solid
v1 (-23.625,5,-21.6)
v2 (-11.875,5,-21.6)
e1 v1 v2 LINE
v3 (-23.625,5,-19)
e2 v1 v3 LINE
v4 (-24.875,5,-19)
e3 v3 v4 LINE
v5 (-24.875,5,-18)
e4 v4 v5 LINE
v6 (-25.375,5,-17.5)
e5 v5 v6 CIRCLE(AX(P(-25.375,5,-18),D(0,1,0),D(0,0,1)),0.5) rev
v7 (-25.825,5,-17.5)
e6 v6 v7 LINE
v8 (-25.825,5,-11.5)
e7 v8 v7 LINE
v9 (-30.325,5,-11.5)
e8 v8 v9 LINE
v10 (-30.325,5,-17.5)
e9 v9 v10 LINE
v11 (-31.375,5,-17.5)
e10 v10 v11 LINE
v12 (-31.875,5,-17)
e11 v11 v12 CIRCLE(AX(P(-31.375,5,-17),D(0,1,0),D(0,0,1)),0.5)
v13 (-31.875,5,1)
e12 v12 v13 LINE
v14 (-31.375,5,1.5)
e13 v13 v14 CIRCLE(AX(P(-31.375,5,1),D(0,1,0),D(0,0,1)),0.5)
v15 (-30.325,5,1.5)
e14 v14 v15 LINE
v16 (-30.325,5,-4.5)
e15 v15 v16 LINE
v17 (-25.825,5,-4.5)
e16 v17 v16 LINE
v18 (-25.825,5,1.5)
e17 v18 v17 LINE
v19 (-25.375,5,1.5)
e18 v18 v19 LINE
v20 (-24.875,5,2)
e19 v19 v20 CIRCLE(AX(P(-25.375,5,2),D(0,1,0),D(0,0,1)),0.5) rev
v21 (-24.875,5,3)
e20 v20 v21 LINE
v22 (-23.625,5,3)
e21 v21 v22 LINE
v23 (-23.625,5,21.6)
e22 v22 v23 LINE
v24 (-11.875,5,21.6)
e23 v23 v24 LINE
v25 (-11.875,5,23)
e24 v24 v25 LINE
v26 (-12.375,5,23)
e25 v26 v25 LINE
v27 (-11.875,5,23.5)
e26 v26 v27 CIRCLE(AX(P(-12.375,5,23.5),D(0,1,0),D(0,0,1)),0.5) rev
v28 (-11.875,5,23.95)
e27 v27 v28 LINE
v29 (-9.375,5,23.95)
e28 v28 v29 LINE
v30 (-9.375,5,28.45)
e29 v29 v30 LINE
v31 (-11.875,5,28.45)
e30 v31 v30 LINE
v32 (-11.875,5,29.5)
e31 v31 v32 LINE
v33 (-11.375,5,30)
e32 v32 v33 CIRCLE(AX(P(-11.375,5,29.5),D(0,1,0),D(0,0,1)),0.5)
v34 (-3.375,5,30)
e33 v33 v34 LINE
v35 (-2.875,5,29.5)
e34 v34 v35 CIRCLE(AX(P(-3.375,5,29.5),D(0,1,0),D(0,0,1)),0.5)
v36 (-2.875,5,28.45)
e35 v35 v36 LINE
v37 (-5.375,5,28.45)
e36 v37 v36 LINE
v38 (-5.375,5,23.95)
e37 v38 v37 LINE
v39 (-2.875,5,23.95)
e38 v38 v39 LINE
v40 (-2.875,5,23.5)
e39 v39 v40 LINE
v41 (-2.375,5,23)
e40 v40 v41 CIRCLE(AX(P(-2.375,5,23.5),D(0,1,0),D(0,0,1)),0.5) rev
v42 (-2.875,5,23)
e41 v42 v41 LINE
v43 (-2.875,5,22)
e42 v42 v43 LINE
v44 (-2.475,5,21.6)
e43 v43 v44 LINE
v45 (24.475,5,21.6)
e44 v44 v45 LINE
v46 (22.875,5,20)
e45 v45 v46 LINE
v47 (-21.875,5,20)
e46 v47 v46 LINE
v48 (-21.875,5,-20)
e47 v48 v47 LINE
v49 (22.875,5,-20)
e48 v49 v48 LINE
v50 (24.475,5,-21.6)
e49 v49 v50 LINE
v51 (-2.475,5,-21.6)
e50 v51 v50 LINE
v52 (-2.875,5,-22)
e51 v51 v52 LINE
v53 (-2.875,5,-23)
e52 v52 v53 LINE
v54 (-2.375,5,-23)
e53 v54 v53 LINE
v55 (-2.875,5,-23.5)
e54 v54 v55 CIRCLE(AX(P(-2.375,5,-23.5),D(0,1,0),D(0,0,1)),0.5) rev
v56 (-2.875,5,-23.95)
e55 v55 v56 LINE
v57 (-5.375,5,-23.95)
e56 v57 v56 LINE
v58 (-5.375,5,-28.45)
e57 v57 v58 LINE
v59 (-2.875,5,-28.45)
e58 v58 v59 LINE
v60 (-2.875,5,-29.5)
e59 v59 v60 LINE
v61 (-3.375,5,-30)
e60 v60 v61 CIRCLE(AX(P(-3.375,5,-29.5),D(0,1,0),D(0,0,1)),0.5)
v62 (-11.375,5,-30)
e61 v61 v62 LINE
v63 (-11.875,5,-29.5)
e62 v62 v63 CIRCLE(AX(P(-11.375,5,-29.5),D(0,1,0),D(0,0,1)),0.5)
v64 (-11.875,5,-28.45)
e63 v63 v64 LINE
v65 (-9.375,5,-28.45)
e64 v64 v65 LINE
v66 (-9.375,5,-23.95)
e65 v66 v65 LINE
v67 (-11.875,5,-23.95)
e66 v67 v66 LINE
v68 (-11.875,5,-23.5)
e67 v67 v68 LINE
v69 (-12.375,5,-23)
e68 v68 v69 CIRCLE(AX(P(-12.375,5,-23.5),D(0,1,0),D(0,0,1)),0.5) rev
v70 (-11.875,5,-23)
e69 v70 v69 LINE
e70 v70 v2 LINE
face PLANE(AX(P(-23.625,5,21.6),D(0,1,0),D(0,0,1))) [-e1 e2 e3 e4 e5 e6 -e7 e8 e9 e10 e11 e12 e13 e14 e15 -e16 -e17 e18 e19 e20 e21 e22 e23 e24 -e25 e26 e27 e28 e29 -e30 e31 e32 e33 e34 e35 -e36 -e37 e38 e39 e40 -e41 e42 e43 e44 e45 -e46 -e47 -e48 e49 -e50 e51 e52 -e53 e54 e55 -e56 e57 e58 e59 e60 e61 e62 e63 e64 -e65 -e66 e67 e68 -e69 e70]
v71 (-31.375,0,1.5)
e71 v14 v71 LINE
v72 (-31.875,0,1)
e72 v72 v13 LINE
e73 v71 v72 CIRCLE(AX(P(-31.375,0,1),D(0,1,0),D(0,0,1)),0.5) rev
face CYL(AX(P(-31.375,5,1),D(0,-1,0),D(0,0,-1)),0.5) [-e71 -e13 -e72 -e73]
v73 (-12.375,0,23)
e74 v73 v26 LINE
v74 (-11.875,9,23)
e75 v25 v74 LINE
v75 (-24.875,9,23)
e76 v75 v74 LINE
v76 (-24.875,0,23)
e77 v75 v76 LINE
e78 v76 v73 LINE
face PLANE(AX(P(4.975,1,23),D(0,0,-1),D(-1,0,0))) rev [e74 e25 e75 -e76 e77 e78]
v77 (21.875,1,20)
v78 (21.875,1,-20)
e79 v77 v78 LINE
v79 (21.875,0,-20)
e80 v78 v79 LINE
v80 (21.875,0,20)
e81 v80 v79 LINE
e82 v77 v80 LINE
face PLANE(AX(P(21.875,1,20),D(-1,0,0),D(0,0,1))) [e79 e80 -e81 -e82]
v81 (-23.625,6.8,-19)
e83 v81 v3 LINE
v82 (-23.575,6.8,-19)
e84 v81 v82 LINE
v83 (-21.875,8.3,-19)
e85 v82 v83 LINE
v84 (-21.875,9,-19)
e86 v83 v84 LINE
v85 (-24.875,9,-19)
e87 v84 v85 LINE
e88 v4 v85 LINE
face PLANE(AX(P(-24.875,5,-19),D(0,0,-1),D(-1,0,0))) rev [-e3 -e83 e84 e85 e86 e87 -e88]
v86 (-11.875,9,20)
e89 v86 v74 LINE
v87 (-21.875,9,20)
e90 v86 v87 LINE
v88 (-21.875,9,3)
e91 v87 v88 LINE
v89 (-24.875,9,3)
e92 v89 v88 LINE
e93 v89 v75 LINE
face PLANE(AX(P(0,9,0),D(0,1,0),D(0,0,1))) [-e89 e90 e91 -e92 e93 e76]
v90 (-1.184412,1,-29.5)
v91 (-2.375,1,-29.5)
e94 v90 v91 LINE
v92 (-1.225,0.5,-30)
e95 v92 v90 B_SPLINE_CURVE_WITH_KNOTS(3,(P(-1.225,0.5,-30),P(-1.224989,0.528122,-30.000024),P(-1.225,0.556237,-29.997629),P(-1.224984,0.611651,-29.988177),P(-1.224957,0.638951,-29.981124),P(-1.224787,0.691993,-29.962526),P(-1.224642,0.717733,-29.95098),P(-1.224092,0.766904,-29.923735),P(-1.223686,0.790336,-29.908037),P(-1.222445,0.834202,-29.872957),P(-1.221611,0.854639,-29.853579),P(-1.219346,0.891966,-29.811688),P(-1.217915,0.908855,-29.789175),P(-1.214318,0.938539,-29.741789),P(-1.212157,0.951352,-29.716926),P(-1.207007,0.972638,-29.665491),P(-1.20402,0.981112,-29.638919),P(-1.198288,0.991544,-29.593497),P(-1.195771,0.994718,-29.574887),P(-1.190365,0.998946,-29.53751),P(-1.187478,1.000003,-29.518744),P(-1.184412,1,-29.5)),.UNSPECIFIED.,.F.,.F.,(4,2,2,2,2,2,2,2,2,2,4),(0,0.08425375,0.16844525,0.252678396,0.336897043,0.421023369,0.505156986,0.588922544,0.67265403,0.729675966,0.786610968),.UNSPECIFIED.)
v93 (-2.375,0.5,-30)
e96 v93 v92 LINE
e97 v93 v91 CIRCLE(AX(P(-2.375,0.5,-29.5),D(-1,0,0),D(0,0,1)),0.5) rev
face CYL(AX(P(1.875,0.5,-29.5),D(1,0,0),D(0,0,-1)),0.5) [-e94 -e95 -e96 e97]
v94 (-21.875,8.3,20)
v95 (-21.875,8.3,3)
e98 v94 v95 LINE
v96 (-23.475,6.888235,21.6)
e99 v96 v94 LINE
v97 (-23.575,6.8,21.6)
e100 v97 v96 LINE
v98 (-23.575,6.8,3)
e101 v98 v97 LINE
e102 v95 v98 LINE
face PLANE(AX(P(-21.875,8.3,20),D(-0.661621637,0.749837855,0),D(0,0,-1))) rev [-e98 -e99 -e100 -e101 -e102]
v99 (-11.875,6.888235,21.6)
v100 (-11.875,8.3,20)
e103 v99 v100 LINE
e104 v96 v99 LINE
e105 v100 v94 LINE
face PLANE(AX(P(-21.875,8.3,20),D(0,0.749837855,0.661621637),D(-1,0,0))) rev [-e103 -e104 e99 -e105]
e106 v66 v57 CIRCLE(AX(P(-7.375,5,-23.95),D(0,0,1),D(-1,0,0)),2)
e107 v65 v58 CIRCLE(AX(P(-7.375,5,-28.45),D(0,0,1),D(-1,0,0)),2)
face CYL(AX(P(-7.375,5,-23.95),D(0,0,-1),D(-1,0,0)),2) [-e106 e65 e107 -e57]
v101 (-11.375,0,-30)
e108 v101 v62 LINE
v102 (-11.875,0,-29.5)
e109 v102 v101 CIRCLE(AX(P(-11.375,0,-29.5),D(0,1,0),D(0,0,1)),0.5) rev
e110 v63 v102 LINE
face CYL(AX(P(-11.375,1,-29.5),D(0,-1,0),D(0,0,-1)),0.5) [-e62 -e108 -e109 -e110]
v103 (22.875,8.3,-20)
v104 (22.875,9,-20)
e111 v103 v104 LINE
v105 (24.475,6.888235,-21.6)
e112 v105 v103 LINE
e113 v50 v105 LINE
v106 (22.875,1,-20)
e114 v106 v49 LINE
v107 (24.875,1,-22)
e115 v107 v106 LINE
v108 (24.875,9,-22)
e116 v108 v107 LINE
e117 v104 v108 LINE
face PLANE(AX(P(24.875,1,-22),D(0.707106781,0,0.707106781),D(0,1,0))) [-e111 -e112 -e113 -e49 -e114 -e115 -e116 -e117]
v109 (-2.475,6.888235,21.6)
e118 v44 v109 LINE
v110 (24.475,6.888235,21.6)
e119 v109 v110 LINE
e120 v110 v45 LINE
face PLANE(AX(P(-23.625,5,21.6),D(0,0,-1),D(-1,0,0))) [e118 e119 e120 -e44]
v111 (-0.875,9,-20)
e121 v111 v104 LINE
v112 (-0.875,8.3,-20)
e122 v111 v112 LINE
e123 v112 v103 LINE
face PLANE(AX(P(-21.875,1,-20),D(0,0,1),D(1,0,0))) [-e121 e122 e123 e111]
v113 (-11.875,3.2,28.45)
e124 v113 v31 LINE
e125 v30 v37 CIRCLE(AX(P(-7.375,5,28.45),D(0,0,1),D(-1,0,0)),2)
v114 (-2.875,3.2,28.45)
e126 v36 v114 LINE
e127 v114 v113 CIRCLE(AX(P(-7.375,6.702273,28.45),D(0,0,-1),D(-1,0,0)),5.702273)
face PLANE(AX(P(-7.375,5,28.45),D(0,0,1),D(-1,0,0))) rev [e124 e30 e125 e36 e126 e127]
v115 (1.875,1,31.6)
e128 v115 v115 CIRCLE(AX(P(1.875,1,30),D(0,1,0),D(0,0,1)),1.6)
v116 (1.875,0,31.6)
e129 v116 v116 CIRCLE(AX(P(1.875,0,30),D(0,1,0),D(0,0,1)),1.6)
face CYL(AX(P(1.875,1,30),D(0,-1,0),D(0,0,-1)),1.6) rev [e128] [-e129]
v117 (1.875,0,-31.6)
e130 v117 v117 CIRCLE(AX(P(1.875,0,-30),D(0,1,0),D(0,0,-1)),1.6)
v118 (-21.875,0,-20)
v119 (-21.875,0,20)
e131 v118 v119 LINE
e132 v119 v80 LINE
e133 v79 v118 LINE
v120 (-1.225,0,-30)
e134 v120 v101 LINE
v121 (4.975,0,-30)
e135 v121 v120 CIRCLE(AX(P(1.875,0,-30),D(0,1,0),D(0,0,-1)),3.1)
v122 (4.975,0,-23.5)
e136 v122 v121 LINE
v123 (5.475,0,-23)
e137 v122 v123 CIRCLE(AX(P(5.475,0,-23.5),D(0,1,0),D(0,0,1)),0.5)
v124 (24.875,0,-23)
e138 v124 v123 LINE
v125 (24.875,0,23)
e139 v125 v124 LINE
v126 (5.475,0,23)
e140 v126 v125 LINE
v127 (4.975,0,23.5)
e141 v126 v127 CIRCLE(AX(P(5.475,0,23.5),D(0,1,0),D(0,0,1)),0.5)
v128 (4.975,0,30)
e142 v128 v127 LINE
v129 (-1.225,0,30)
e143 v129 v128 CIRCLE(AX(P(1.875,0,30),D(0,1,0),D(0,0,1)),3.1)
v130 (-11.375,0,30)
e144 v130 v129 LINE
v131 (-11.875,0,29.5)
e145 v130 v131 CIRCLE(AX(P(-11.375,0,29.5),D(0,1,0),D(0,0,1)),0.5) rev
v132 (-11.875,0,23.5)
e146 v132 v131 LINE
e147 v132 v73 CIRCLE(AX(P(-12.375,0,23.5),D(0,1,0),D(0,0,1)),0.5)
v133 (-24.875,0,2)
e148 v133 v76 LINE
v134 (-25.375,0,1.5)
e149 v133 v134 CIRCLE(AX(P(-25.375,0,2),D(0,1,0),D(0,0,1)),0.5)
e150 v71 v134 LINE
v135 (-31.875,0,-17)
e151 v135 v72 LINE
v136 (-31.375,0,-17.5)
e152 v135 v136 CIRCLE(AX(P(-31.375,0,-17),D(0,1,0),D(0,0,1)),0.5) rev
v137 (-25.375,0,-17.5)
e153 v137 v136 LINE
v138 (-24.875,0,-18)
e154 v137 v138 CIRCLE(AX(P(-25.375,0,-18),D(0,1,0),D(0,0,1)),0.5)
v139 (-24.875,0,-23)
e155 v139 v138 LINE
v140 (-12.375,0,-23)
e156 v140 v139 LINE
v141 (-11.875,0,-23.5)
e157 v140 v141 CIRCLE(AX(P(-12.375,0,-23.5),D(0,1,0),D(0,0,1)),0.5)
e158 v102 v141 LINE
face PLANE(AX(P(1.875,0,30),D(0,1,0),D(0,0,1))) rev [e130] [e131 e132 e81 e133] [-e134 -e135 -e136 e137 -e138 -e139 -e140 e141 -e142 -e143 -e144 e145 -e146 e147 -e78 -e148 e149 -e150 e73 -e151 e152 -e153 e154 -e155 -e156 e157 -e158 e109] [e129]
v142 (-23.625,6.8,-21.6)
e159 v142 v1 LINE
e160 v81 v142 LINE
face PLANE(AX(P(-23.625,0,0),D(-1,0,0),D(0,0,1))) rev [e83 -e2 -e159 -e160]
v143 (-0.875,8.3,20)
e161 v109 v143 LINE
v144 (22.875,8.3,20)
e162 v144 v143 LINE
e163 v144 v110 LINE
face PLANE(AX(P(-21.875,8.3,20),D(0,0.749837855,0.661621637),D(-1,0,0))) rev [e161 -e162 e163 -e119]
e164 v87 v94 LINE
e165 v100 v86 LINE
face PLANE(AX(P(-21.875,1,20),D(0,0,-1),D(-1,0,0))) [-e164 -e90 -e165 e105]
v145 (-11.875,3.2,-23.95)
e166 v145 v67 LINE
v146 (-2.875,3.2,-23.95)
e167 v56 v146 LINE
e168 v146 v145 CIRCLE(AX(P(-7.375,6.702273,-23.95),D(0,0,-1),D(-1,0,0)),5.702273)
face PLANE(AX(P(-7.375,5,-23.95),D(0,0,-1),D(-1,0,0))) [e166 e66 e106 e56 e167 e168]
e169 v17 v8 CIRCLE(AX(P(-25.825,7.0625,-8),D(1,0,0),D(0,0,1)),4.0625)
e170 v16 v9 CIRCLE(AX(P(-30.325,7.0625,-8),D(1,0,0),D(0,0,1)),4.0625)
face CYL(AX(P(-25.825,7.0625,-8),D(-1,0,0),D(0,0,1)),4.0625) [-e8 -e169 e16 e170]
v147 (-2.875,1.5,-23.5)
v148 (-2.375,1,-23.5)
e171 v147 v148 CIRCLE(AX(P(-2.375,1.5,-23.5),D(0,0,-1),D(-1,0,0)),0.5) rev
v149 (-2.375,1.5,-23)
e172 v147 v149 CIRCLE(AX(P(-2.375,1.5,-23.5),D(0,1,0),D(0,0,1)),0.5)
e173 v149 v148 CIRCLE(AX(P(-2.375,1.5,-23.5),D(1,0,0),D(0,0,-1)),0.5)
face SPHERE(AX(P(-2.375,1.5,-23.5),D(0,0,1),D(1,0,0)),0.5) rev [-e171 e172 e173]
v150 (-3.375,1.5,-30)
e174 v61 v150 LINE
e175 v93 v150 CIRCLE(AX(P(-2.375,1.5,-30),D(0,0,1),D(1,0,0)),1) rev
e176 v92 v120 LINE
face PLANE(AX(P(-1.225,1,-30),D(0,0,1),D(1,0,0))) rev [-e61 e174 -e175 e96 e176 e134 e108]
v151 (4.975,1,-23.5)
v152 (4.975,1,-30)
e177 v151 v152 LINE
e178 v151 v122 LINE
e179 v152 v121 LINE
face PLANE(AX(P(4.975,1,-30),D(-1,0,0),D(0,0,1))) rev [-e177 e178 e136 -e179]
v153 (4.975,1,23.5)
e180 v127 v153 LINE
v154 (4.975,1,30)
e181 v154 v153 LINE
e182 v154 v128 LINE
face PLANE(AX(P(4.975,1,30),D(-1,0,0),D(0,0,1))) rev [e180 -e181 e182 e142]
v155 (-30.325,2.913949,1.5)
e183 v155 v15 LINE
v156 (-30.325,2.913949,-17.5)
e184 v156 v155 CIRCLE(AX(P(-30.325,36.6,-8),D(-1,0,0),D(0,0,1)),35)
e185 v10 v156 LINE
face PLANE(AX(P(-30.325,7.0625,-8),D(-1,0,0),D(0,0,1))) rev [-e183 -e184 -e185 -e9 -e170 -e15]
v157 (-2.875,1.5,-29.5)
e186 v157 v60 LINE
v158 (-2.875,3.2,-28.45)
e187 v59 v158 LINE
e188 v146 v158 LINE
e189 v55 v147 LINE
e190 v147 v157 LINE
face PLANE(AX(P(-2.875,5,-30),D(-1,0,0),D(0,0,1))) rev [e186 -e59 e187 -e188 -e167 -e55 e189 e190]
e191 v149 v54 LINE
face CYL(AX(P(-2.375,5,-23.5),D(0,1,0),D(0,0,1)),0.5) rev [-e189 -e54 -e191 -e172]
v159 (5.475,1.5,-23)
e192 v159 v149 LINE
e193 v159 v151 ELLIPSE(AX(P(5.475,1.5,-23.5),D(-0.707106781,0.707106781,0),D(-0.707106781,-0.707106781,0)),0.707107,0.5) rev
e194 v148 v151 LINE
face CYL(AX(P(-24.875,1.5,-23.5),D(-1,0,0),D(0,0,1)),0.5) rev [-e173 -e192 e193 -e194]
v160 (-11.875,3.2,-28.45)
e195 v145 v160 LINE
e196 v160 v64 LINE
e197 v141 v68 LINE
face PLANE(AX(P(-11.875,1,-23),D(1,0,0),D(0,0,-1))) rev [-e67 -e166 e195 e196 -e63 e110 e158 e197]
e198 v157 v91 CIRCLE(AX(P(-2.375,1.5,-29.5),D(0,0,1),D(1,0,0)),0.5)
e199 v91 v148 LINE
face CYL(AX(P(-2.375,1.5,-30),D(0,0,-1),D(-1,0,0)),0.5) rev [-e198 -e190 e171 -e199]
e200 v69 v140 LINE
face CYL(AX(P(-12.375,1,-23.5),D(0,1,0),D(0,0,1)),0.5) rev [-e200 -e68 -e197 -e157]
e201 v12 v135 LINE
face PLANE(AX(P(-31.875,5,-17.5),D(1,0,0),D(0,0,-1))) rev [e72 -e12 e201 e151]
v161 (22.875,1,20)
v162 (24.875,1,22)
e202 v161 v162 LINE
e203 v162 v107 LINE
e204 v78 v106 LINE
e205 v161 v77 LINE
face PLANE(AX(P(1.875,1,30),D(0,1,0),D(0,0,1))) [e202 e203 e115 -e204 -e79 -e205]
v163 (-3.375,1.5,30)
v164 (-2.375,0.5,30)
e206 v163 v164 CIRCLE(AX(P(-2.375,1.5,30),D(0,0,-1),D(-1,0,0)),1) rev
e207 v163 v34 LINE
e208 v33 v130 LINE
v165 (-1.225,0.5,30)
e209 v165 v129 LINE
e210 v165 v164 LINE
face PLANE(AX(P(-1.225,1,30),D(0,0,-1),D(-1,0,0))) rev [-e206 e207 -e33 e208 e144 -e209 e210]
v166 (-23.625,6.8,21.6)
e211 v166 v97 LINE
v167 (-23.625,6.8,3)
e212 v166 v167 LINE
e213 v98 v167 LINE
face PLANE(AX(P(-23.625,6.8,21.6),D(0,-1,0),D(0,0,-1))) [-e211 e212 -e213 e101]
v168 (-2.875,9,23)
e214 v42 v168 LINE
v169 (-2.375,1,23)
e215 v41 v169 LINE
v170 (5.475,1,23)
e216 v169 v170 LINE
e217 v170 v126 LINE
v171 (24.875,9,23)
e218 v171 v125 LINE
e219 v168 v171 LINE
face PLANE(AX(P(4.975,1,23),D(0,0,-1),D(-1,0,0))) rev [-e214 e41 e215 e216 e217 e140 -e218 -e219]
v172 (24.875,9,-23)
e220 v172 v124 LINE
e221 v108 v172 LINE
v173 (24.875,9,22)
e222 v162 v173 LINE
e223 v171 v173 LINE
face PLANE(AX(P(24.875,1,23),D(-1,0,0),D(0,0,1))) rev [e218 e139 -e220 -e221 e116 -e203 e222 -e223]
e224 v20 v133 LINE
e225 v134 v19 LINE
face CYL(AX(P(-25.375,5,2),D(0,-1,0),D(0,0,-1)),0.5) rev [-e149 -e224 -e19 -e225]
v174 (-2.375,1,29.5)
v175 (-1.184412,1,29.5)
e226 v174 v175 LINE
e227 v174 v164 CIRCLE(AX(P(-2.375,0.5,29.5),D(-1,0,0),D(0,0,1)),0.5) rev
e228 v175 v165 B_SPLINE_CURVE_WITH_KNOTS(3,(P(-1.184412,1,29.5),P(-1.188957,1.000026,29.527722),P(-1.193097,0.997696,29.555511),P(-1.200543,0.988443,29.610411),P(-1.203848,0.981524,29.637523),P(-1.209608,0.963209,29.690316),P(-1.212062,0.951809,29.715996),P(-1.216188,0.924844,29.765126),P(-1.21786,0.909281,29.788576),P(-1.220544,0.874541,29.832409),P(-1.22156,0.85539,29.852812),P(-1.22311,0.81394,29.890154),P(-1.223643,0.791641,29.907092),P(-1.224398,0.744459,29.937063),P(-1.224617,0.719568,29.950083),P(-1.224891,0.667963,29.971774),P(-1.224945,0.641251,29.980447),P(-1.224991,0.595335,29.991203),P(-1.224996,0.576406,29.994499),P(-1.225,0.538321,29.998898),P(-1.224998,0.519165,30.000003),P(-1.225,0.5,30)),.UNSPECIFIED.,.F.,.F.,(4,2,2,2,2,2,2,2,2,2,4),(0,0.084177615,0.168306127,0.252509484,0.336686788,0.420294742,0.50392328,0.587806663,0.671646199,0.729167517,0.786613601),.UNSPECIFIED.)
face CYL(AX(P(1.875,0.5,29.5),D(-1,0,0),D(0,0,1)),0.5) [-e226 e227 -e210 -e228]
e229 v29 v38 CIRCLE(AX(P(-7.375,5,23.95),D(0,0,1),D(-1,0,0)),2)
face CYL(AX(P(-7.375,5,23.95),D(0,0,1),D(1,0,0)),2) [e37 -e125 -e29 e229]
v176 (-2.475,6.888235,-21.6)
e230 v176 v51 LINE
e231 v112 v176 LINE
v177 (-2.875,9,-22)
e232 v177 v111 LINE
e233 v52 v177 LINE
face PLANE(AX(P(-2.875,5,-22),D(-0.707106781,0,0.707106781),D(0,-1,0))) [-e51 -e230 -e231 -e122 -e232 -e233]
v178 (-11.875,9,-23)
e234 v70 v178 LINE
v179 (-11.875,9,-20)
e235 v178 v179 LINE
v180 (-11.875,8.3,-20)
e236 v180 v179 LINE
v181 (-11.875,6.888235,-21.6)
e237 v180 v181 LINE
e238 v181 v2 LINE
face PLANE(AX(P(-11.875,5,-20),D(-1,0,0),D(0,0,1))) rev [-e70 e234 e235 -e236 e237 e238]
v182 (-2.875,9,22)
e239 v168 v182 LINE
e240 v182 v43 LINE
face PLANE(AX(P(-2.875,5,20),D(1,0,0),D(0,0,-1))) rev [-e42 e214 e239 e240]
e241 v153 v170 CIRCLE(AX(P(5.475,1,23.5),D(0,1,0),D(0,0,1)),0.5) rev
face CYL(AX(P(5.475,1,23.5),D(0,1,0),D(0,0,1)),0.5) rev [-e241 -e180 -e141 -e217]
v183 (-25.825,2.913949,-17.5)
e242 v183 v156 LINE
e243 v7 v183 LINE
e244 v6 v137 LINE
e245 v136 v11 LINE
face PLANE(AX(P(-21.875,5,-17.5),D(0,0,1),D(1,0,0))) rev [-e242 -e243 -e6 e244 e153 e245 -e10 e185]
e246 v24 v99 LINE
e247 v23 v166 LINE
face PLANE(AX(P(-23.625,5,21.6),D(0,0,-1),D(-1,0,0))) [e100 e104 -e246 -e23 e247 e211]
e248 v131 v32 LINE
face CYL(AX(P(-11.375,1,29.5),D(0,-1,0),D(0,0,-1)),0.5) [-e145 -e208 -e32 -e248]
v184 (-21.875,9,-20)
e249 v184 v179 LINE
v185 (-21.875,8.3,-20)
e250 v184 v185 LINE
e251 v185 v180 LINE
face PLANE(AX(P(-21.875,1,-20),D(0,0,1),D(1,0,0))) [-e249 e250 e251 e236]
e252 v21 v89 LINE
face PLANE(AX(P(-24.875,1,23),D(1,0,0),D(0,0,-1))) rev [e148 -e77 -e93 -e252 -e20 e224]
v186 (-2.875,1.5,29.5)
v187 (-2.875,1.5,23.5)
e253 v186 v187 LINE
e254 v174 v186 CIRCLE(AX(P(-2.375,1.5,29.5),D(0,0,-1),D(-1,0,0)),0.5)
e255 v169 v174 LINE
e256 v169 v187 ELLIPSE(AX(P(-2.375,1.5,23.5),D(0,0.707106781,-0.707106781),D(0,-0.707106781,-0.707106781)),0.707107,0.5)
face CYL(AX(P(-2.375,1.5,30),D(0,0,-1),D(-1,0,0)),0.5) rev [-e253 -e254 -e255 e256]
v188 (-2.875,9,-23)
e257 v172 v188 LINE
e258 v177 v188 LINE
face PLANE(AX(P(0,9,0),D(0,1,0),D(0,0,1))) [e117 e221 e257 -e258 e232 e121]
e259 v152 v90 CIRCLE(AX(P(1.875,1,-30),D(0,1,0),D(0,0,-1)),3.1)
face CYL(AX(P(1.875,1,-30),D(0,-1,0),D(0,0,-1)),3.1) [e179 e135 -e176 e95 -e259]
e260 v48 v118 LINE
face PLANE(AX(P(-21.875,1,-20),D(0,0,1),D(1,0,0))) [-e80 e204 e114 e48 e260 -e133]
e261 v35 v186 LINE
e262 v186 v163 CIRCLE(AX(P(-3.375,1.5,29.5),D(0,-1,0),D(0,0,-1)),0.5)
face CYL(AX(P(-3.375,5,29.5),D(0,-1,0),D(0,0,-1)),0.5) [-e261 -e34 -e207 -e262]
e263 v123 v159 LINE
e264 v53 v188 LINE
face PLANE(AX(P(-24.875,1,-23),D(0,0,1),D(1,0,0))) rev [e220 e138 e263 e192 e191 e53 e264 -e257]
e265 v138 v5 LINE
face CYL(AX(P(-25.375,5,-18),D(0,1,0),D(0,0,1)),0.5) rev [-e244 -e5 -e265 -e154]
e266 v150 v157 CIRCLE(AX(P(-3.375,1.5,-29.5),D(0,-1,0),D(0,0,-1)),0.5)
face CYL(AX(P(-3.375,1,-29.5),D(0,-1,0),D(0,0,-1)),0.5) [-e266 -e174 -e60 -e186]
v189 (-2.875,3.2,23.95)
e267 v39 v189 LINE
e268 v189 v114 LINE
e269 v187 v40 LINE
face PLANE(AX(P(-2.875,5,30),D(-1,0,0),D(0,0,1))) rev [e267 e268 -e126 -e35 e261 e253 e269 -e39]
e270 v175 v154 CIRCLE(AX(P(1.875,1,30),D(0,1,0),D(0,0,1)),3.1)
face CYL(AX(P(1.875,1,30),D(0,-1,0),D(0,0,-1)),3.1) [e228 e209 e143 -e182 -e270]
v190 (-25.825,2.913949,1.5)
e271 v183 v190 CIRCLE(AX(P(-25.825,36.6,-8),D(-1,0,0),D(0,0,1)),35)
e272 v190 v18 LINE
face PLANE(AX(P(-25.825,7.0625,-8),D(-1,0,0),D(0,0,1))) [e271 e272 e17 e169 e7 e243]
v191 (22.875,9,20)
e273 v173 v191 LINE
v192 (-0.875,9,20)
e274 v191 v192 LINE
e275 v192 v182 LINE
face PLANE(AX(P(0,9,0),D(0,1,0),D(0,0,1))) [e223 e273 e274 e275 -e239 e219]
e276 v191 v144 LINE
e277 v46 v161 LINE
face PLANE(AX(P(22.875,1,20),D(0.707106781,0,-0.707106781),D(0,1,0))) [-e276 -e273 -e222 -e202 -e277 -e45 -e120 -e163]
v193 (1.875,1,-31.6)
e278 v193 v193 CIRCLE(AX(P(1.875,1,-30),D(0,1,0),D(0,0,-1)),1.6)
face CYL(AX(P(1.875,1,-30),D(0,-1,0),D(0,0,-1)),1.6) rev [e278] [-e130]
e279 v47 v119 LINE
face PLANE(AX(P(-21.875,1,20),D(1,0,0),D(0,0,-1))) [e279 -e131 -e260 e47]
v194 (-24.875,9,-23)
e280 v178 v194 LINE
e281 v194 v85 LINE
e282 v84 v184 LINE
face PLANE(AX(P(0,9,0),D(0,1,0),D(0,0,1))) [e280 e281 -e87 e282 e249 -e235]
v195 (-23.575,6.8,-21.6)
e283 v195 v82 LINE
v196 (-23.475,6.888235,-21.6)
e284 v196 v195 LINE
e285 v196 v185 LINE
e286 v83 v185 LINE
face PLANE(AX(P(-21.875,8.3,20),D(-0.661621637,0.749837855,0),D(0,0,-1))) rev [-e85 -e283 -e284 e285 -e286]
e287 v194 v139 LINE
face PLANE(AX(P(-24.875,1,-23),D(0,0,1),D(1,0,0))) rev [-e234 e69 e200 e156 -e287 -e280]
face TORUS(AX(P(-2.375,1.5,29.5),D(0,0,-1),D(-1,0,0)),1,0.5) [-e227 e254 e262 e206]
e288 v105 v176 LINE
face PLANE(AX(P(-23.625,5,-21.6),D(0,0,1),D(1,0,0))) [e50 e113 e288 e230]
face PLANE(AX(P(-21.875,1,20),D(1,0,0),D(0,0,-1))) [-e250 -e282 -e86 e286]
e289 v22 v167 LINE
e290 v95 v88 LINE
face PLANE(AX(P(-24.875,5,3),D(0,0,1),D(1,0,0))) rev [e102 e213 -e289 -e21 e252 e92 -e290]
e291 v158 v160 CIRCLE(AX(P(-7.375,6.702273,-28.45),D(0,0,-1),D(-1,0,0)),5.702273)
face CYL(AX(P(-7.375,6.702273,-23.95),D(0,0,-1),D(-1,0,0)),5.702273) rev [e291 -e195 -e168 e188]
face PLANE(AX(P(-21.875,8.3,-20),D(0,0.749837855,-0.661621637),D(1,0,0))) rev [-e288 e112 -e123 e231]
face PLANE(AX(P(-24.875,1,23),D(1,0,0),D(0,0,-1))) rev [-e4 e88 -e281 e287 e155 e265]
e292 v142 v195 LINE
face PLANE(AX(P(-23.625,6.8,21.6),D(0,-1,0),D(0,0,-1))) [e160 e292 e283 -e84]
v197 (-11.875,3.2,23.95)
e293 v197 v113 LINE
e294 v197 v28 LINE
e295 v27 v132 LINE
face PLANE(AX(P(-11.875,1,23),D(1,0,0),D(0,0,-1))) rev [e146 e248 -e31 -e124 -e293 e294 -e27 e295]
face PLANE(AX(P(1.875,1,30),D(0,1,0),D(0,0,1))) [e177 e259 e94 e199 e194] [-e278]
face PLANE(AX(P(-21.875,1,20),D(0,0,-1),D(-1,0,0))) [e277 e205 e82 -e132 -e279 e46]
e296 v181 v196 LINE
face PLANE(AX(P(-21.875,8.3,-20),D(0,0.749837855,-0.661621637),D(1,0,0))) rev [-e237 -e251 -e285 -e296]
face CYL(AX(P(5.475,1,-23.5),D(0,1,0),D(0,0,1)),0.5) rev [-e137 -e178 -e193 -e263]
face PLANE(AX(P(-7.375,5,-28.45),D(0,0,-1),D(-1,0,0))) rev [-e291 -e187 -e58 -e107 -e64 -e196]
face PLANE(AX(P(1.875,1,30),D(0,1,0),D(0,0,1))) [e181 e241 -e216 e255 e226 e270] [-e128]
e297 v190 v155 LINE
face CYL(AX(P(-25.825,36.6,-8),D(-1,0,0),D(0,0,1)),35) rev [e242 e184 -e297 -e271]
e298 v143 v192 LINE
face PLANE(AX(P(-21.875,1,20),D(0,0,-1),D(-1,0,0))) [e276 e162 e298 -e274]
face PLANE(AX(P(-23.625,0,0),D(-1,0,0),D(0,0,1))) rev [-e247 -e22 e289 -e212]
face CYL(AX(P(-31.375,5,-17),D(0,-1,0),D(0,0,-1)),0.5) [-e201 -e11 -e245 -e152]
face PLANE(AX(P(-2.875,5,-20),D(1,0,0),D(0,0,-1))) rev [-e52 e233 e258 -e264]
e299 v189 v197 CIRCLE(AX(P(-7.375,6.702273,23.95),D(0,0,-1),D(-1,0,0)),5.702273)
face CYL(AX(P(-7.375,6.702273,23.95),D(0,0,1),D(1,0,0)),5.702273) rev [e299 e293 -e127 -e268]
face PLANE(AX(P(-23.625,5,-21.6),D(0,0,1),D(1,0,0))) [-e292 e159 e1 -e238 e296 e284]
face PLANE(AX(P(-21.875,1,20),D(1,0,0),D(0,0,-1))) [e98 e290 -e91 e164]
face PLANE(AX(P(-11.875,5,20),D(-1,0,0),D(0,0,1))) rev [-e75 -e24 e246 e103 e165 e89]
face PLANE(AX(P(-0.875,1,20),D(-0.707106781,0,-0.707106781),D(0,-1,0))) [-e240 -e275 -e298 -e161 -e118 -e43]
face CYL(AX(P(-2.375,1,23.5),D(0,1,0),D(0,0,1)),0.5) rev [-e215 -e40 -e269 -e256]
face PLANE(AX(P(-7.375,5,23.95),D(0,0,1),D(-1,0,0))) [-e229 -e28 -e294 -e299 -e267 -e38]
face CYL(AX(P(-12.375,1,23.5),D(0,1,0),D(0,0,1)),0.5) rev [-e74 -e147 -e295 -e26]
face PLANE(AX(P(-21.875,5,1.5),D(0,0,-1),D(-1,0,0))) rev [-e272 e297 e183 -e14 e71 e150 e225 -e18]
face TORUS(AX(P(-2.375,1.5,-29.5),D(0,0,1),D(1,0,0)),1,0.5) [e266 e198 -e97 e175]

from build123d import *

# Parameters (mm, degrees)
CROQUIS1_R              = 1.6
CROQUIS1_W              = 43.75
CROQUIS1_H              = 40
SALIENTE_EXTRUIR1_DEPTH = 1
SALIENTE_EXTRUIR2_DEPTH = 8
CROQUIS3_W              = 43.2
CROQUIS3_H              = 1.8
CORTAR_EXTRUIR1_DEPTH   = 48.5
CROQUIS4_W              = 9
CROQUIS4_H              = 3
CORTAR_EXTRUIR3_DEPTH   = 4
CHAFL_N2_SIZE           = 2
CROQUIS5_W              = 9
CROQUIS5_H              = 7
SALIENTE_EXTRUIR3_DEPTH = 4
CORTAR_EXTRUIR7_DEPTH   = 2.25
CROQUIS9_W              = 10
CROQUIS9_H              = 19
SALIENTE_EXTRUIR4_DEPTH = 5
CROQUIS10_W             = 3
CROQUIS10_H             = 22
CORTAR_EXTRUIR5_DEPTH   = 4
REDONDEO2_R             = 0.5
CORTAR_EXTRUIR8_DEPTH   = 2.25


with BuildPart() as part:
    # Croquis1 → Saliente-Extruir1 (new body)
    with BuildSketch(Plane(origin=(0, 0, 0), x_dir=(1, 0, 0), z_dir=(0, 1, 0))):
        with BuildLine():
            Line((4.975, -30), (4.975, -23))
            Line((4.975, -23), (24.875, -23))
            Line((24.875, -23), (24.875, 23))
            Line((24.875, 23), (4.975, 23))
            Line((4.975, 23), (4.975, 30))
            ThreePointArc((4.975, 30), (1.875, 33.1), (-1.225, 30))
            Line((-1.225, 30), (-11.875, 30))
            Line((-11.875, 30), (-11.875, 23))
            Line((-11.875, 23), (-24.875, 23))
            Line((-24.875, 23), (-24.875, -23))
            Line((-24.875, -23), (-11.875, -23))
            Line((-11.875, -23), (-11.875, -30))
            Line((-11.875, -30), (-1.225, -30))
            ThreePointArc((-1.225, -30), (1.875, -33.1), (4.975, -30))
        make_face()
        with Locations(Location((1.875, -30, 0), (0, 0, 270))):
            Circle(CROQUIS1_R, mode=Mode.SUBTRACT)
        with Locations(Location((1.875, 30, 0), (0, 0, 90))):
            Circle(CROQUIS1_R, mode=Mode.SUBTRACT)
        Rectangle(CROQUIS1_W, CROQUIS1_H, mode=Mode.SUBTRACT)
    extrude(amount=SALIENTE_EXTRUIR1_DEPTH)

    # Croquis2 → Saliente-Extruir2 (add)
    with BuildSketch(Plane(origin=(0, 1, 0), x_dir=(1, 0, 0), z_dir=(0, 1, 0))):
        Polygon((21.875, -20), (24.875, -20), (24.875, -23), (-24.875, -23), (-24.875, 23), (24.875, 23), (24.875, 20), (21.875, 20), (-21.875, 20), (-21.875, -20), align=None)
    extrude(amount=SALIENTE_EXTRUIR2_DEPTH)

    # Croquis3 → Cortar-Extruir1 (cut)
    with BuildSketch(Plane.ZY.offset(-24.875)):
        with Locations((0, 5.9)):
            Rectangle(CROQUIS3_W, CROQUIS3_H)
    extrude(amount=CORTAR_EXTRUIR1_DEPTH, mode=Mode.SUBTRACT)

    # Chaflán1
    # the kernel refuses this chamfer: 1.7, 1.5 mm, written as the material it takes off along each edge
    with BuildSketch(Plane(origin=(24.875, 6.8, -20), x_dir=(0, 0.9994558527200353, 0.03298482171646588), z_dir=(-1, 0, 0))) as chafl_n1_piece_1_section:
        with BuildLine():
            Line((1.545831431, 0), (-0.102721849, 1.748552182))
            Line((-0.102721849, 1.748552182), (-0.136703348, 1.747430698))
            ThreePointArc((-0.136703348, 1.747430698), (-0.062859529, 0.873896605), (-0.033981499, -0.001121484))
            Line((-0.033981499, -0.001121484), (0.001121484, -0.033981499))
            ThreePointArc((0.001121484, -0.033981499), (0.773196268, -0.008500885), (1.546952915, -0.033981499))
            Line((1.546952915, -0.033981499), (1.545831431, 0))
        make_face()
    chafl_n1_piece_1 = extrude(amount=46.75, mode=Mode.PRIVATE)
    chafl_n1_piece_1 = split(chafl_n1_piece_1, bisect_by=Plane(origin=(1.5, 7.297528396, -21.6), z_dir=(0, 0, 1)), keep=Keep.TOP, mode=Mode.PRIVATE)
    add(chafl_n1_piece_1, mode=Mode.SUBTRACT)
    with BuildSketch(Plane(origin=(-21.875, 6.8, 20), x_dir=(0, 0.9994558527200353, -0.03298482171646588), z_dir=(1, 0, 0))) as chafl_n1_piece_2_section:
        with BuildLine():
            Line((1.545831431, 0), (-0.102721849, 1.748552182))
            Line((-0.102721849, 1.748552182), (-0.136703348, 1.747430698))
            ThreePointArc((-0.136703348, 1.747430698), (-0.062859529, 0.873896605), (-0.033981499, -0.001121484))
            Line((-0.033981499, -0.001121484), (0.001121484, -0.033981499))
            ThreePointArc((0.001121484, -0.033981499), (0.773196268, -0.008500885), (1.546952915, -0.033981499))
            Line((1.546952915, -0.033981499), (1.545831431, 0))
        make_face()
    chafl_n1_piece_2 = extrude(amount=46.75, mode=Mode.PRIVATE)
    chafl_n1_piece_2 = split(chafl_n1_piece_2, bisect_by=Plane(origin=(1.5, 7.297528396, 21.6), z_dir=(0, 0, -1)), keep=Keep.TOP, mode=Mode.PRIVATE)
    add(chafl_n1_piece_2, mode=Mode.SUBTRACT)
    with BuildSketch(Plane(origin=(-21.875, 6.8, -20), x_dir=(0.03298482171646358, 0.9994558527200355, 0), z_dir=(0, 0, 1))) as chafl_n1_piece_3:
        with BuildLine():
            Line((1.545831431, 0), (-0.102721849, 1.748552182))
            Line((-0.102721849, 1.748552182), (-0.136703348, 1.747430698))
            ThreePointArc((-0.136703348, 1.747430698), (-0.062859529, 0.873896605), (-0.033981499, -0.001121484))
            Line((-0.033981499, -0.001121484), (0.001121484, -0.033981499))
            ThreePointArc((0.001121484, -0.033981499), (0.773196268, -0.008500885), (1.546952915, -0.033981499))
            Line((1.546952915, -0.033981499), (1.545831431, 0))
        make_face()
    extrude(amount=40, mode=Mode.SUBTRACT)
    with BuildSketch(Plane(origin=(24.875, 6.8, -20), x_dir=(0, 0.9994558527200353, 0.03298482171646588), z_dir=(-1, 0, 0))) as chafl_n1_piece_4a_section:
        with BuildLine():
            Line((1.545831431, 0), (-0.102721849, 1.748552182))
            Line((-0.102721849, 1.748552182), (-0.136703348, 1.747430698))
            ThreePointArc((-0.136703348, 1.747430698), (-0.062859529, 0.873896605), (-0.033981499, -0.001121484))
            Line((-0.033981499, -0.001121484), (0.001121484, -0.033981499))
            ThreePointArc((0.001121484, -0.033981499), (0.773196268, -0.008500885), (1.546952915, -0.033981499))
            Line((1.546952915, -0.033981499), (1.545831431, 0))
        make_face()
    chafl_n1_piece_4a = extrude(amount=51.128917184, mode=Mode.PRIVATE)
    chafl_n1_piece_4a = split(chafl_n1_piece_4a, bisect_by=Plane(origin=(-21.875, 7.297528396, -20.551236264), z_dir=(-1, 0, 0)), keep=Keep.TOP, mode=Mode.PRIVATE)
    chafl_n1_piece_4a = split(chafl_n1_piece_4a, bisect_by=Plane(origin=(-23.625, 7.297528396, -20.551236264), z_dir=(1, 0, 0)), keep=Keep.TOP, mode=Mode.PRIVATE)
    chafl_n1_piece_4a = split(chafl_n1_piece_4a, bisect_by=Plane(origin=(-22.75, 7.297528396, -21.6), z_dir=(0, 0, 1)), keep=Keep.TOP, mode=Mode.PRIVATE)
    with BuildSketch(Plane(origin=(-21.875, 6.8, -24.378917184), x_dir=(0.03298482171646588, 0.9994558527200353, 0), z_dir=(0, 0, 1))) as chafl_n1_piece_4b_section:
        with BuildLine():
            Line((1.545831431, 0), (-0.102721849, 1.748552182))
            Line((-0.102721849, 1.748552182), (-0.136703348, 1.747430698))
            ThreePointArc((-0.136703348, 1.747430698), (-0.062859529, 0.873896605), (-0.033981499, -0.001121484))
            Line((-0.033981499, -0.001121484), (0.001121484, -0.033981499))
            ThreePointArc((0.001121484, -0.033981499), (0.773196268, -0.008500885), (1.546952915, -0.033981499))
            Line((1.546952915, -0.033981499), (1.545831431, 0))
        make_face()
    chafl_n1_piece_4b = extrude(amount=44.378917184, mode=Mode.PRIVATE)
    chafl_n1_piece_4b = split(chafl_n1_piece_4b, bisect_by=Plane(origin=(-22.437497136, 7.292287741, -20), z_dir=(0, 0, -1)), keep=Keep.TOP, mode=Mode.PRIVATE)
    chafl_n1_piece_4b = split(chafl_n1_piece_4b, bisect_by=Plane(origin=(-22.437497136, 7.292287741, -21.6), z_dir=(0, 0, 1)), keep=Keep.TOP, mode=Mode.PRIVATE)
    chafl_n1_piece_4 = chafl_n1_piece_4a & chafl_n1_piece_4b
    add(chafl_n1_piece_4, mode=Mode.SUBTRACT)
    with BuildSketch(Plane(origin=(-21.875, 6.8, -20), x_dir=(0.03298482171646358, 0.9994558527200355, 0), z_dir=(0, 0, 1))) as chafl_n1_piece_5a_section:
        with BuildLine():
            Line((1.545831431, 0), (-0.102721849, 1.748552182))
            Line((-0.102721849, 1.748552182), (-0.136703348, 1.747430698))
            ThreePointArc((-0.136703348, 1.747430698), (-0.062859529, 0.873896605), (-0.033981499, -0.001121484))
            Line((-0.033981499, -0.001121484), (0.001121484, -0.033981499))
            ThreePointArc((0.001121484, -0.033981499), (0.773196268, -0.008500885), (1.546952915, -0.033981499))
            Line((1.546952915, -0.033981499), (1.545831431, 0))
        make_face()
    chafl_n1_piece_5a = extrude(amount=44.378917184, mode=Mode.PRIVATE)
    chafl_n1_piece_5a = split(chafl_n1_piece_5a, bisect_by=Plane(origin=(-22.437497136, 7.292287741, 20), z_dir=(0, 0, 1)), keep=Keep.TOP, mode=Mode.PRIVATE)
    chafl_n1_piece_5a = split(chafl_n1_piece_5a, bisect_by=Plane(origin=(-22.437497136, 7.292287741, 21.6), z_dir=(0, 0, -1)), keep=Keep.TOP, mode=Mode.PRIVATE)
    with BuildSketch(Plane(origin=(-26.253917184, 6.8, 20), x_dir=(0, 0.9994558527200353, -0.03298482171646588), z_dir=(1, 0, 0))) as chafl_n1_piece_5b_section:
        with BuildLine():
            Line((1.545831431, 0), (-0.102721849, 1.748552182))
            Line((-0.102721849, 1.748552182), (-0.136703348, 1.747430698))
            ThreePointArc((-0.136703348, 1.747430698), (-0.062859529, 0.873896605), (-0.033981499, -0.001121484))
            Line((-0.033981499, -0.001121484), (0.001121484, -0.033981499))
            ThreePointArc((0.001121484, -0.033981499), (0.773196268, -0.008500885), (1.546952915, -0.033981499))
            Line((1.546952915, -0.033981499), (1.545831431, 0))
        make_face()
    chafl_n1_piece_5b = extrude(amount=51.128917184, mode=Mode.PRIVATE)
    chafl_n1_piece_5b = split(chafl_n1_piece_5b, bisect_by=Plane(origin=(-21.875, 7.297528396, 20.551236264), z_dir=(-1, 0, 0)), keep=Keep.TOP, mode=Mode.PRIVATE)
    chafl_n1_piece_5b = split(chafl_n1_piece_5b, bisect_by=Plane(origin=(-22.75, 7.297528396, 21.6), z_dir=(0, 0, -1)), keep=Keep.TOP, mode=Mode.PRIVATE)
    chafl_n1_piece_5b = split(chafl_n1_piece_5b, bisect_by=Plane(origin=(-23.625, 7.297528396, 20.551236264), z_dir=(1, 0, 0)), keep=Keep.TOP, mode=Mode.PRIVATE)
    chafl_n1_piece_5 = chafl_n1_piece_5a & chafl_n1_piece_5b
    add(chafl_n1_piece_5, mode=Mode.SUBTRACT)

    # Croquis4 → Cortar-Extruir3 (cut)
    with BuildSketch(Plane(origin=(0, 9, 0), x_dir=(1, 0, 0), z_dir=(0, 1, 0))):
        with Locations((-7.375, -21.5)):
            Rectangle(CROQUIS4_W, CROQUIS4_H)
        with Locations((-7.375, 21.5)):
            Rectangle(CROQUIS4_W, CROQUIS4_H)
    extrude(amount=-CORTAR_EXTRUIR3_DEPTH, mode=Mode.SUBTRACT)

    # Chaflán2
    # the kernel refuses this chamfer: 2 mm, written as the material it takes off along each edge
    with BuildSketch(Plane(origin=(-2.875, 14.143365976, 20), x_dir=(-0.027495876610586296, 0, 0.9996219169112968), z_dir=(0, -1, 0))) as chafl_n2_piece_1_section:
        Polygon((CHAFL_N2_SIZE * 0.999621916911, -CHAFL_N2_SIZE * 0.0274958766106), (-CHAFL_N2_SIZE * 0.0274958766106, -CHAFL_N2_SIZE * 0.999621916911), (0, 0), align=None)
    chafl_n2_piece_1 = extrude(amount=10.986731952, mode=Mode.PRIVATE)
    chafl_n2_piece_1 = split(chafl_n2_piece_1, bisect_by=Plane(origin=(-2.743425682, 5, 21.736851363), z_dir=(0, 1, 0)), keep=Keep.TOP, mode=Mode.PRIVATE)
    add(chafl_n2_piece_1, mode=Mode.SUBTRACT)
    with BuildSketch(Plane(origin=(-2.875, 14.143365976, -20), x_dir=(0.9996219169112968, 0, 0.027495876610585623), z_dir=(0, -1, 0))) as chafl_n2_piece_2_section:
        Polygon((CHAFL_N2_SIZE * 0.999621916911, -CHAFL_N2_SIZE * 0.0274958766106), (-CHAFL_N2_SIZE * 0.0274958766106, -CHAFL_N2_SIZE * 0.999621916911), (0, 0), align=None)
    chafl_n2_piece_2 = extrude(amount=10.986731952, mode=Mode.PRIVATE)
    chafl_n2_piece_2 = split(chafl_n2_piece_2, bisect_by=Plane(origin=(-2.25030089, 5, -20.750601779), z_dir=(0, 1, 0)), keep=Keep.TOP, mode=Mode.PRIVATE)
    add(chafl_n2_piece_2, mode=Mode.SUBTRACT)
    with BuildSketch(Plane(origin=(24.875, 3.156634024, 20), x_dir=(-0.9996219169112968, 0, -0.027495876610585647), z_dir=(0, 1, 0))) as chafl_n2_piece_3:
        Polygon((CHAFL_N2_SIZE * 0.999621916911, CHAFL_N2_SIZE * 0.0274958766106), (-CHAFL_N2_SIZE * 0.0274958766106, CHAFL_N2_SIZE * 0.999621916911), (0, 0), align=None)
    extrude(amount=10.986731952, mode=Mode.SUBTRACT)
    with BuildSketch(Plane(origin=(24.875, 3.156634024, -20), x_dir=(-0.9996219169112968, 0, 0.027495876610585647), z_dir=(0, 1, 0))) as chafl_n2_piece_4:
        Polygon((CHAFL_N2_SIZE * 0.999621916911, -CHAFL_N2_SIZE * 0.0274958766106), (-CHAFL_N2_SIZE * 0.0274958766106, -CHAFL_N2_SIZE * 0.999621916911), (0, 0), align=None)
    extrude(amount=10.986731952, mode=Mode.SUBTRACT)
    with BuildSketch(Plane(origin=(24.875, 1, 20), x_dir=(-0.9996219169112968, 0, -0.027495876610587326), z_dir=(0, 1, 0))) as chafl_n2_piece_5:
        Polygon((CHAFL_N2_SIZE * 0.999621916911, CHAFL_N2_SIZE * 0.0274958766106), (-CHAFL_N2_SIZE * 0.0274958766106, CHAFL_N2_SIZE * 0.999621916911), (0, 0), align=None)
    extrude(amount=9.143365976, mode=Mode.SUBTRACT)
    with BuildSketch(Plane(origin=(24.875, 1, -20), x_dir=(-0.9996219169112968, 0, 0.027495876610585647), z_dir=(0, 1, 0))) as chafl_n2_piece_6:
        Polygon((CHAFL_N2_SIZE * 0.999621916911, -CHAFL_N2_SIZE * 0.0274958766106), (-CHAFL_N2_SIZE * 0.0274958766106, -CHAFL_N2_SIZE * 0.999621916911), (0, 0), align=None)
    extrude(amount=9.143365976, mode=Mode.SUBTRACT)

    # Croquis5 → Saliente-Extruir3 (add)
    with BuildSketch(Plane(origin=(0, 1, 0), x_dir=(1, 0, 0), z_dir=(0, 1, 0))):
        with Locations((-7.375, 26.5)):
            Rectangle(CROQUIS5_W, CROQUIS5_H)
        with Locations((-7.375, -26.5)):
            Rectangle(CROQUIS5_W, CROQUIS5_H)
    extrude(amount=SALIENTE_EXTRUIR3_DEPTH)

    # Croquis8 → Cortar-Extruir7 (cut, symmetric)
    with BuildSketch(Plane(origin=(0, 0, -26.2), x_dir=(-1, 0, 0), z_dir=(0, 0, -1))):
        with BuildLine():
            Line((2.875, 5), (2.875, 3.2))
            ThreePointArc((2.875, 3.2), (7.375, 1), (11.875, 3.2))
            Line((11.875, 3.2), (11.875, 5))
            Line((11.875, 5), (9.375, 5))
            ThreePointArc((9.375, 5), (7.375, 3), (5.375, 5))
            Line((5.375, 5), (2.875, 5))
        make_face()
    cortar_extruir7 = extrude(amount=CORTAR_EXTRUIR7_DEPTH, both=True, mode=Mode.SUBTRACT)

    # Simetría1: Cortar-Extruir7 across plane
    add(cortar_extruir7.mirror(Plane.XY), mode=Mode.SUBTRACT)

    # Croquis9 → Saliente-Extruir4 (add)
    with BuildSketch(Plane(origin=(0, 0, 0), x_dir=(1, 0, 0), z_dir=(0, 1, 0))):
        with Locations((-26.875, 8)):
            Rectangle(CROQUIS9_W, CROQUIS9_H)
    extrude(amount=SALIENTE_EXTRUIR4_DEPTH)

    # Croquis10 → Cortar-Extruir5 (cut)
    with BuildSketch(Plane(origin=(0, 9, 0), x_dir=(1, 0, 0), z_dir=(0, 1, 0))):
        with Locations((-23.375, 8)):
            Rectangle(CROQUIS10_W, CROQUIS10_H)
    extrude(amount=-CORTAR_EXTRUIR5_DEPTH, mode=Mode.SUBTRACT)

    # Redondeo2
    redondeo2_edges = [part.edges().sort_by_distance(p)[0] for p in [
        (-2.05, 1, -30),
        (4.975, 0.5, 23),
        (-11.875, 2.5, 30),
        (-11.875, 2.5, 23),
        (-11.875, 2.5, -23),
        (-11.875, 2.5, -30),
        (4.975, 0.5, -23),
        (-2.875, 1, -26.5),
        (-2.875, 3, -23),
        (-2.875, 3, -30),
        (-2.05, 1, 30),
        (-2.875, 1, 26.5),
        (-2.875, 3, 30),
        (-2.875, 3, 23),
        (-24.875, 2.5, 1.5),
        (-24.875, 2.5, -17.5),
        (-31.875, 2.5, 1.5),
        (-31.875, 2.5, -17.5),
        (1.05, 1, -23),
    ]]
    fillet(redondeo2_edges, radius=REDONDEO2_R)

    # Croquis11 → Cortar-Extruir8 (cut, symmetric)
    with BuildSketch(Plane.ZY.offset(28.075)):
        with BuildLine():
            Line((-17.5, 5), (-17.5, 2.913949475))
            ThreePointArc((-17.5, 2.913949475), (-8, 1.6), (1.5, 2.913949475))
            Line((1.5, 2.913949475), (1.5, 5))
            Line((1.5, 5), (-4.5, 5))
            ThreePointArc((-4.5, 5), (-8, 3), (-11.5, 5))
            Line((-11.5, 5), (-17.5, 5))
        make_face()
    extrude(amount=CORTAR_EXTRUIR8_DEPTH, both=True, mode=Mode.SUBTRACT)


solid = part.part
